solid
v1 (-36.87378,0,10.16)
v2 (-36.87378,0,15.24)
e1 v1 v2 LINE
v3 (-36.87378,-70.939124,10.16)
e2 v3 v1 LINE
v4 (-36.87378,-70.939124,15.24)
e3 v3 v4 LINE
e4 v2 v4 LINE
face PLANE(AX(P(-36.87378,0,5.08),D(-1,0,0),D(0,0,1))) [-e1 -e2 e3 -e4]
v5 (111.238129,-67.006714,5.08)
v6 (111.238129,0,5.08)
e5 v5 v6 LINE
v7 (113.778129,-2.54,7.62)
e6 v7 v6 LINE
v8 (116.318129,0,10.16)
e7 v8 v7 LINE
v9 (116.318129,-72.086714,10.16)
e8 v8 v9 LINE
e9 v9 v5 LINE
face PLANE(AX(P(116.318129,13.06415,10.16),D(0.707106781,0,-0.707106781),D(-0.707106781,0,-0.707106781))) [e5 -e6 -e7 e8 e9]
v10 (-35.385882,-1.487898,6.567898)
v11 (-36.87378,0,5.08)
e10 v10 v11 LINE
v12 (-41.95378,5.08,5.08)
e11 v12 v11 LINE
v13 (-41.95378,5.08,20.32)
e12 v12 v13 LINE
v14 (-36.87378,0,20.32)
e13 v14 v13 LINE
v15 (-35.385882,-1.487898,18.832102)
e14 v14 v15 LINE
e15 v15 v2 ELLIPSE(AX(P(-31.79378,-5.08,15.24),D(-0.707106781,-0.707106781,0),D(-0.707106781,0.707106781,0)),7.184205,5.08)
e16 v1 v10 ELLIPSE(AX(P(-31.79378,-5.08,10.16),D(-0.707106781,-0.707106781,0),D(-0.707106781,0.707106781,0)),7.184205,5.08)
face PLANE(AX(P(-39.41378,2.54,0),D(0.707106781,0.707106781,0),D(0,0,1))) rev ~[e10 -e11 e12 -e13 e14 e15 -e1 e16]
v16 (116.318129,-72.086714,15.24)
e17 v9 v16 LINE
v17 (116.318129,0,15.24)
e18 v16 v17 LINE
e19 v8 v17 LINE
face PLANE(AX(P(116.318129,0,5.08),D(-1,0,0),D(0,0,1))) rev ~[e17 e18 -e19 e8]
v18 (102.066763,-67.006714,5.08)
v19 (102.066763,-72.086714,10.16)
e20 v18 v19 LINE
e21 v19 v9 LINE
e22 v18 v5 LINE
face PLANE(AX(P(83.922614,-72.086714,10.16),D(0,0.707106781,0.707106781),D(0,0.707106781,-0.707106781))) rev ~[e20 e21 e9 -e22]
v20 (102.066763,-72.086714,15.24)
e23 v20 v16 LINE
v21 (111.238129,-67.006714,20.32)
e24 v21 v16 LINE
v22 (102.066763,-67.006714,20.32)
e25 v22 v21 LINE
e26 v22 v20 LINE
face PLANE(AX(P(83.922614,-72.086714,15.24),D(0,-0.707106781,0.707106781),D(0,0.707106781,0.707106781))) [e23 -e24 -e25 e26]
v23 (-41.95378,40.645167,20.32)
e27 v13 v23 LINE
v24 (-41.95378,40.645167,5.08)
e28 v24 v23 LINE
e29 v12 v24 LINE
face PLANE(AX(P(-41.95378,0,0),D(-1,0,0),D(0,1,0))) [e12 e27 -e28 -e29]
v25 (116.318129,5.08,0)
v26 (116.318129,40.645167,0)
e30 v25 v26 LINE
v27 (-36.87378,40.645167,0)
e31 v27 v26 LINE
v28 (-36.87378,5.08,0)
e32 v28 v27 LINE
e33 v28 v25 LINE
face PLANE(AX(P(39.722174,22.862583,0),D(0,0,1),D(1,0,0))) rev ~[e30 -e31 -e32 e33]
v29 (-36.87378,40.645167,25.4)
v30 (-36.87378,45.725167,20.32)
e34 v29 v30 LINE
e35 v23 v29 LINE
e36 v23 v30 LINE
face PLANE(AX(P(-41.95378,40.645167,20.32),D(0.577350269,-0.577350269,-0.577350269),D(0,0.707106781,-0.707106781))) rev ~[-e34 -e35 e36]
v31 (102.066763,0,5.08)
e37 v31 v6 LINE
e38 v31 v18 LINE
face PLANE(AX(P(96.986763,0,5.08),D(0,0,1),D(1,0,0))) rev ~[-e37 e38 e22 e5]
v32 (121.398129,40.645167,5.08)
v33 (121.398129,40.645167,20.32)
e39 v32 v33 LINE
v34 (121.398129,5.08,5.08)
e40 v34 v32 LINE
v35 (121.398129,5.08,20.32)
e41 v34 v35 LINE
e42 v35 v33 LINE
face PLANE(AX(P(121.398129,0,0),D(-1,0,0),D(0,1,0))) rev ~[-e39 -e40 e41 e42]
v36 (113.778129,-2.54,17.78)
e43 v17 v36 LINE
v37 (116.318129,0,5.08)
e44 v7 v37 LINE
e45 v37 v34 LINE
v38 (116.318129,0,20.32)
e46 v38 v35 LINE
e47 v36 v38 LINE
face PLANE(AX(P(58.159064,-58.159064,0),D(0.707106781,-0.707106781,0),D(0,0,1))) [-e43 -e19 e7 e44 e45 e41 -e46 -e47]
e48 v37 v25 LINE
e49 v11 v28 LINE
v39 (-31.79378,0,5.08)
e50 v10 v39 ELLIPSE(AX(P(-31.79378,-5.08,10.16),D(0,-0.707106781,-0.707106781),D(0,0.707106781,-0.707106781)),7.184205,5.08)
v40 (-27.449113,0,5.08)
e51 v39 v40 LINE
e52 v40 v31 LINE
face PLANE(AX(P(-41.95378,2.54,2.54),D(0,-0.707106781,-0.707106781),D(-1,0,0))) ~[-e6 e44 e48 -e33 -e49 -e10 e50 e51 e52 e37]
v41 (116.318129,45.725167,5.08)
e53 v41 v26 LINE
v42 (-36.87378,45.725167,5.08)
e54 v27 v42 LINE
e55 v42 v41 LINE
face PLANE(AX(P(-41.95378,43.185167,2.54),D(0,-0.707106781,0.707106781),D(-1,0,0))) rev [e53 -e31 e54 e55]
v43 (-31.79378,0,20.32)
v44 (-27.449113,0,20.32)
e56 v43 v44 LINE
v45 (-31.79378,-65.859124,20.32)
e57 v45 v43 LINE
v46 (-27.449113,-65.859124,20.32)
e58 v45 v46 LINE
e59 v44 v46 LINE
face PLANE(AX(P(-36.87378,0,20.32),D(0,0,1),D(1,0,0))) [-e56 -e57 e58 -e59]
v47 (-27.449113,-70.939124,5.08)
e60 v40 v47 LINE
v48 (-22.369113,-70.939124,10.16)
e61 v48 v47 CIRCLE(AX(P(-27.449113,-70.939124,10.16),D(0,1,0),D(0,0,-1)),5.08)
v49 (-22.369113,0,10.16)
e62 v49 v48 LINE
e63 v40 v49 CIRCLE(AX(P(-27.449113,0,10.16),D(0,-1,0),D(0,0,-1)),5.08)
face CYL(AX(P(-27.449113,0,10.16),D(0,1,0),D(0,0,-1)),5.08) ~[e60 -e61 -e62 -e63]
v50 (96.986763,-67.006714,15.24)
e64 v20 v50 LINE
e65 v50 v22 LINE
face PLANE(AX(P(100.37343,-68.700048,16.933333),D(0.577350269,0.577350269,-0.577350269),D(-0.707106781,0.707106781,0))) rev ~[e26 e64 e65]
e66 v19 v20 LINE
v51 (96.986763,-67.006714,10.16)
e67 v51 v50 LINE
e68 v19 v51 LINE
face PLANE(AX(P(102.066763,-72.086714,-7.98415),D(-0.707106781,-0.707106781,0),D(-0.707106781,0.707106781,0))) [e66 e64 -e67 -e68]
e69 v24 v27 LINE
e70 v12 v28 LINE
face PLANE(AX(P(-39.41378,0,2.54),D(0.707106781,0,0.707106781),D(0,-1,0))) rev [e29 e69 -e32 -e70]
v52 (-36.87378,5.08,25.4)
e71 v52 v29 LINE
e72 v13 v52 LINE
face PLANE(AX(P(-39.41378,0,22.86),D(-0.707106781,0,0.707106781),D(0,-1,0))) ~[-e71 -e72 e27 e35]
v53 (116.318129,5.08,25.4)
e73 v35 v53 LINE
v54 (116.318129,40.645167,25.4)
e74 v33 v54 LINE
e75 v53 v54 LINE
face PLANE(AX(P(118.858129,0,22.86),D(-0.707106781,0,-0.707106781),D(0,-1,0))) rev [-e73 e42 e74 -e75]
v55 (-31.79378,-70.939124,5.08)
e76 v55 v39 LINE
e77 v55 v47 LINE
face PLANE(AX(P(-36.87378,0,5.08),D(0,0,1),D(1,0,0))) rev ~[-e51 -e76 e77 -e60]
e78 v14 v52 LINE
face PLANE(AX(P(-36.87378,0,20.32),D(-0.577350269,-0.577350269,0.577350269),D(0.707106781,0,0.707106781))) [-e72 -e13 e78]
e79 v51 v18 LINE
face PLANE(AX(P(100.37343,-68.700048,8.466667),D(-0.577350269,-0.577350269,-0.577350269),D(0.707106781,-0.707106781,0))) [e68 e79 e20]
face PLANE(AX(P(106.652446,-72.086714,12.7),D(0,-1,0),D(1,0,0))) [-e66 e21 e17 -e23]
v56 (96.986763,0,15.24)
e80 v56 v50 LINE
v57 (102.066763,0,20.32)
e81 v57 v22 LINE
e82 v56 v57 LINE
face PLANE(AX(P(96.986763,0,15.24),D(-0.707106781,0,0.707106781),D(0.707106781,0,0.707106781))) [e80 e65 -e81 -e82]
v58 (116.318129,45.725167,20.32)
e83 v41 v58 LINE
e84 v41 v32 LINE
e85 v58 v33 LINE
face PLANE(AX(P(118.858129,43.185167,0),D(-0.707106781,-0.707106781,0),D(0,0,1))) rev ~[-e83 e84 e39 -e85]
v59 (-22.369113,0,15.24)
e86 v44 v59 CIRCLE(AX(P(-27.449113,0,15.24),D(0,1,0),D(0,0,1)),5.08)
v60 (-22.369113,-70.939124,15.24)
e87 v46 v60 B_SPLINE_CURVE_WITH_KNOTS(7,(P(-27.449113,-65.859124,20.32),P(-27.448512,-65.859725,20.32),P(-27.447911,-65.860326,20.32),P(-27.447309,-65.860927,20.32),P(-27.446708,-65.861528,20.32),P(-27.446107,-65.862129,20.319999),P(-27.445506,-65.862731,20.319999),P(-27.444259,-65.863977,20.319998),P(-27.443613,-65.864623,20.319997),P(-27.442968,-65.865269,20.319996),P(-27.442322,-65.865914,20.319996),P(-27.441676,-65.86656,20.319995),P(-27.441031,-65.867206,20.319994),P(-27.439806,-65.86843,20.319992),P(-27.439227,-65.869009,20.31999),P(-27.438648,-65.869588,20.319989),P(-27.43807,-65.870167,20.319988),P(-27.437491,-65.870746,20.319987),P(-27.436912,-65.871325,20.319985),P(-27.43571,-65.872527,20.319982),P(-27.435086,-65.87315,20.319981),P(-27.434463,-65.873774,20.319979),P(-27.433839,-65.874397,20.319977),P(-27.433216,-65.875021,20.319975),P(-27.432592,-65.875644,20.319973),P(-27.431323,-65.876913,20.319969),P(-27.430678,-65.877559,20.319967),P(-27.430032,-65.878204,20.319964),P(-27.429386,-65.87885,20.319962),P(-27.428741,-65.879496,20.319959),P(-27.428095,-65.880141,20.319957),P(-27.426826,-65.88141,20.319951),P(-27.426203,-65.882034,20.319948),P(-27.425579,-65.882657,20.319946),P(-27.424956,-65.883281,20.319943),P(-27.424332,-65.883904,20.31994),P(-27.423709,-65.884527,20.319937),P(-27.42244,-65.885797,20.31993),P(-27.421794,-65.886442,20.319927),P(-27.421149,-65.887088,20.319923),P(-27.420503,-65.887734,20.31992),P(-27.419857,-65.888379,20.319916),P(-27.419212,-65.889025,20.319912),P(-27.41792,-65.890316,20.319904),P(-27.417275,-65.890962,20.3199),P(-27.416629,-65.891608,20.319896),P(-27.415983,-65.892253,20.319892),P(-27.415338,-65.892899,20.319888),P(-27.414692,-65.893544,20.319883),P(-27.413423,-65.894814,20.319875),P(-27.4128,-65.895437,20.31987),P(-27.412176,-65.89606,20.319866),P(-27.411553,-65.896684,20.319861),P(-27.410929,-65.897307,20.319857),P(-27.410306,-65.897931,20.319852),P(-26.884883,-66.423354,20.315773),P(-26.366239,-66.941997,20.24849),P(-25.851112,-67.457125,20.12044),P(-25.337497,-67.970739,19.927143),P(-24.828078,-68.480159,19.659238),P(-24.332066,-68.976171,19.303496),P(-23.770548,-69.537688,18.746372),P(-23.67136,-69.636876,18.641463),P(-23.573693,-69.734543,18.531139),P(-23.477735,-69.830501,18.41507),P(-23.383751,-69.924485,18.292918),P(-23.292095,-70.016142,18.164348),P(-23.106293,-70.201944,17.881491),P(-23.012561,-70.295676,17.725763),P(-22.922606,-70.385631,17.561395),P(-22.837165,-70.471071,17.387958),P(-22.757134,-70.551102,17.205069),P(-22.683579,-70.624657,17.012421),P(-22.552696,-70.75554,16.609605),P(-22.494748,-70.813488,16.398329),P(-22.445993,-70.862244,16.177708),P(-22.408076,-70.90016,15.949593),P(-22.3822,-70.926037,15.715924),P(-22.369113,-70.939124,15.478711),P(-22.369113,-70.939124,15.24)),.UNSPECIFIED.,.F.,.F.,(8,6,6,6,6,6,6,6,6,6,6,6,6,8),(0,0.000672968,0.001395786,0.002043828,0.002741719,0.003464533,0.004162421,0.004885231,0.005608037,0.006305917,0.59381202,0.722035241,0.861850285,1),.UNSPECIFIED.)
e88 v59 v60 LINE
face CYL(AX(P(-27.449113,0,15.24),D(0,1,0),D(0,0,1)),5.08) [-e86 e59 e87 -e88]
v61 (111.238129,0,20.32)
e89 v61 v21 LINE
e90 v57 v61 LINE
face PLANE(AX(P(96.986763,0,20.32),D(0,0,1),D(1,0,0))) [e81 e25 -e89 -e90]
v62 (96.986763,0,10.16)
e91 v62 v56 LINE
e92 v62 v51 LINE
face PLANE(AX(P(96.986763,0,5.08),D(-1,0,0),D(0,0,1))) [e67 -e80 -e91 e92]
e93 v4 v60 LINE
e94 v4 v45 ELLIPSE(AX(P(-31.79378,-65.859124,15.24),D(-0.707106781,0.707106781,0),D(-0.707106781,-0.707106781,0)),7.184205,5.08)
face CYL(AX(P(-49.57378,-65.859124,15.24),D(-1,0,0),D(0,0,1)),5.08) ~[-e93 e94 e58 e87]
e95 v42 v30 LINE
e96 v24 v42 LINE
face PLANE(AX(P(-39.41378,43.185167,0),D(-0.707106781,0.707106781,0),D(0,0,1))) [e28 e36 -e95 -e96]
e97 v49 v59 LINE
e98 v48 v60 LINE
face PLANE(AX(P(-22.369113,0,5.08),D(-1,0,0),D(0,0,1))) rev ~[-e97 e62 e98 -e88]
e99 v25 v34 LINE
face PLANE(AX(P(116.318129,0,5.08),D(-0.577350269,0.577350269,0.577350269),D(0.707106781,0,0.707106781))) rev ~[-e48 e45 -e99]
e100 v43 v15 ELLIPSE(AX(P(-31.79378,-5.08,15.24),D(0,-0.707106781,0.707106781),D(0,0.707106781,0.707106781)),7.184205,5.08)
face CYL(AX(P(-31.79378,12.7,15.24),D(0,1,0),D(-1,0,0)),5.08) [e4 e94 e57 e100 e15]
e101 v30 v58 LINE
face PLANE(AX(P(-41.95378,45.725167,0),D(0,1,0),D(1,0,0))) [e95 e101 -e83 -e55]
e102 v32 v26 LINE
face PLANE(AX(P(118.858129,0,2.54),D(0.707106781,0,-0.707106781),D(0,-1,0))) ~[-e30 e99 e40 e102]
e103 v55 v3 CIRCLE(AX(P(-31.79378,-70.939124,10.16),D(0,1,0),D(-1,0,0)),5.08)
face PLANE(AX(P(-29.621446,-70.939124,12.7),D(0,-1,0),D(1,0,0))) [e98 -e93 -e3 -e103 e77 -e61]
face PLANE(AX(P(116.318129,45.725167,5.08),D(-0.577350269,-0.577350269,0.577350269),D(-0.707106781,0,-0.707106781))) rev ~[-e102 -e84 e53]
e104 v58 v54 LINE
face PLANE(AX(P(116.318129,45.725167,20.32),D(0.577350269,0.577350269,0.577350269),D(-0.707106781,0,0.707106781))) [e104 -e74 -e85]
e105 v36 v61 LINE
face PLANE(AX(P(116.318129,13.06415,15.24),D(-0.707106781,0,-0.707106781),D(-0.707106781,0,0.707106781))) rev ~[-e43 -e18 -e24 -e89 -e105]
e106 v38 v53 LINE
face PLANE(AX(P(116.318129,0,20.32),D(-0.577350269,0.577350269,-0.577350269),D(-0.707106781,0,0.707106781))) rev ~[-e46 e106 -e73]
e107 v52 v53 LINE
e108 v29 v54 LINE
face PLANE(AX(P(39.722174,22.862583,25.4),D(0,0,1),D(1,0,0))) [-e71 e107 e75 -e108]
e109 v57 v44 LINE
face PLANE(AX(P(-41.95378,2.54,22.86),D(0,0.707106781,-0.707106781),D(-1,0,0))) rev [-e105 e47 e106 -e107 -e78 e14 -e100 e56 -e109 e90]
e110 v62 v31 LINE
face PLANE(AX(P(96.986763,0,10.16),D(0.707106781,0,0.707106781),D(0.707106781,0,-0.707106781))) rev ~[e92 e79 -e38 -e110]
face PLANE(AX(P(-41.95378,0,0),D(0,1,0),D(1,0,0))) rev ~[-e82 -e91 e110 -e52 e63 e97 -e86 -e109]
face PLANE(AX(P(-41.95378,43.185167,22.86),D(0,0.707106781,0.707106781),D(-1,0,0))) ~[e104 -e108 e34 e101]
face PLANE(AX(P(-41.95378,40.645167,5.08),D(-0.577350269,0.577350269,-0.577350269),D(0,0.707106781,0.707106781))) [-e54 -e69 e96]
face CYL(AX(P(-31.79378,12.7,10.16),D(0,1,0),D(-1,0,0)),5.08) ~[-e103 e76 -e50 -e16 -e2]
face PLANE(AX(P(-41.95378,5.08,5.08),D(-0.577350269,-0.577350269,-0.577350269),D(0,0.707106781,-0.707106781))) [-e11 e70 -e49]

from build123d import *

# Parameters (mm, degrees)
F0_W         = 163.3519083261
F0_H         = 45.7251667976
F1_DEPTH     = 25.4
F2_SIZE      = 5.08
F3_W         = 14.5046669376
F3_H         = 15.24
F4_DEPTH     = 70.9391236305
F5_W         = 19.3313653898
F5_H         = 15.24
F6_DEPTH     = 72.0867142081
F7_T1_DEPTH  = 39.9046669376
F7_T6_DEPTH  = 96.3391236305
F7_T12_DEPTH = 96.3391236305
F7_T18_DEPTH = 96.3391236305
F7_T24_DEPTH = 83.6391236305
F7_T29_DEPTH = 83.6391236305
F7_T34_DEPTH = 83.6391236305
F7_T39_DEPTH = 83.6391236305
F7_T44_DEPTH = 96.3391236305
F7_T50_DEPTH = 96.3391236305
F7_T56_DEPTH = 96.3391236305
F8_T1_DEPTH  = 6.4524666085
F8_T3_DEPTH  = 6.4524666085
F8_T5_DEPTH  = 85.150863787
F8_T7_DEPTH  = 45.4596645476
F8_T9_DEPTH  = 41.3682991577
F8_T14_DEPTH = 98.2150133659
F8_T19_DEPTH = 98.2150133659
F8_T24_DEPTH = 98.2150133659
F8_T29_DEPTH = 98.2150133659


# Not quite as in the source:
# - a fillet or chamfer that OpenCascade refuses, or shapes differently, is made with other operations: its cross-section is extruded or revolved along the edge and cut away or added


with BuildPart() as f1:
    # F0 (on Top) → F1 (new body)
    with BuildSketch(Plane.XY):
        with Locations((39.7221744061, 22.8625833988)):
            Rectangle(F0_W, F0_H)
    extrude(amount=F1_DEPTH)

    # F2
    f2_edges = [f1.edges().sort_by_distance(p)[0] for p in [
        (121.398129, 22.862583, 25.4),
        (121.398129, 22.862583, 0),
        (39.722174, 0, 0),
        (121.398129, 0, 12.7),
        (121.398129, 45.725167, 12.7),
        (39.722174, 45.725167, 0),
        (39.722174, 45.725167, 25.4),
        (-41.95378, 22.862583, 25.4),
        (-41.95378, 0, 12.7),
        (-41.95378, 22.862583, 0),
        (-41.95378, 45.725167, 12.7),
        (39.722174, 0, 25.4),
    ]]
    chamfer(f2_edges, length=F2_SIZE)

    # F3 (on face) → F4 (join)
    with BuildSketch(Plane.XZ):
        with Locations((-29.6214462882, 12.7)):
            Rectangle(F3_W, F3_H)
    extrude(amount=F4_DEPTH)

    # F5 (on face) → F6 (join)
    with BuildSketch(Plane.XZ):
        with Locations((106.6524458742, 12.7)):
            Rectangle(F5_W, F5_H)
    extrude(amount=F6_DEPTH)

    # F7: fillet of radius 5.08 on 5 edges, made by hand

    # F7_s2 → F7_t1 (cut)
    with BuildSketch(Plane.YZ.offset(-49.573779757)):
        with BuildLine():
            ThreePointArc((-65.8591236305, 20.32), (-69.451226079, 18.8321024484), (-70.9391236305, 15.24))
            Line((-70.9391236305, 15.24), (-70.9391236305, 20.32))
            Line((-70.9391236305, 20.32), (-65.8591236305, 20.32))
        make_face()
    extrude(amount=F7_T1_DEPTH, mode=Mode.SUBTRACT)


with BuildPart() as f7_tool4:
    # F7_s5 → F7_t6 (new body)
    with BuildSketch(Plane.XZ.offset(-12.7)):
        with BuildLine():
            ThreePointArc((-36.873779757, 15.24), (-35.3858822055, 18.8321024484), (-31.793779757, 20.32))
            Line((-31.793779757, 20.32), (-36.873779757, 20.32))
            Line((-36.873779757, 20.32), (-36.873779757, 15.24))
        make_face()
    extrude(amount=F7_T6_DEPTH)

    split(bisect_by=Plane(origin=(-18.4368898785, -18.4368898785, 0), x_dir=(0, 0, 1), z_dir=(0.7071067812, 0.7071067812, 0)), keep=Keep.TOP)

    split(bisect_by=Plane(origin=(0, -10.16, 10.16), x_dir=(1, 0, 0), z_dir=(0, -0.7071067812, 0.7071067812)), keep=Keep.TOP)


with BuildPart() as f1_1:
    add(f1.part)

    # F7_t3: cut F7_tool4
    add(f7_tool4.part, mode=Mode.SUBTRACT)


with BuildPart() as f7_tool10:
    # F7_s11 → F7_t12 (new body)
    with BuildSketch(Plane.XZ.offset(-12.7)):
        with BuildLine():
            ThreePointArc((-36.873779757, 15.24), (-35.3858822055, 18.8321024484), (-31.793779757, 20.32))
            Line((-31.793779757, 20.32), (-36.873779757, 20.32))
            Line((-36.873779757, 20.32), (-36.873779757, 15.24))
        make_face()
    extrude(amount=F7_T12_DEPTH)

    split(bisect_by=Plane(origin=(-18.4368898785, -18.4368898785, 0), x_dir=(0, 0, 1), z_dir=(-0.7071067812, -0.7071067812, 0)), keep=Keep.TOP)

    split(bisect_by=Plane(origin=(0, -10.16, 10.16), x_dir=(1, 0, 0), z_dir=(0, 0.7071067812, -0.7071067812)), keep=Keep.TOP)


with BuildPart() as f1_2:
    add(f1_1.part)

    # F7_t9: cut F7_tool10
    add(f7_tool10.part, mode=Mode.SUBTRACT)


with BuildPart() as f7_tool16:
    # F7_s17 → F7_t18 (new body)
    with BuildSketch(Plane.XZ.offset(-12.7)):
        with BuildLine():
            ThreePointArc((-36.873779757, 15.24), (-35.3858822055, 18.8321024484), (-31.793779757, 20.32))
            Line((-31.793779757, 20.32), (-36.873779757, 20.32))
            Line((-36.873779757, 20.32), (-36.873779757, 15.24))
        make_face()
    extrude(amount=F7_T18_DEPTH)

    split(bisect_by=Plane(origin=(-18.4368898785, -18.4368898785, 0), x_dir=(0, 0, 1), z_dir=(-0.7071067812, -0.7071067812, 0)), keep=Keep.TOP)

    split(bisect_by=Plane(origin=(0, -10.16, 10.16), x_dir=(1, 0, 0), z_dir=(0, -0.7071067812, 0.7071067812)), keep=Keep.TOP)


with BuildPart() as f1_3:
    add(f1_2.part)

    # F7_t15: cut F7_tool16
    add(f7_tool16.part, mode=Mode.SUBTRACT)


with BuildPart() as f7_tool22:
    # F7_s23 → F7_t24 (new body)
    with BuildSketch(Plane.XZ):
        with BuildLine():
            ThreePointArc((-27.4491128194, 5.08), (-23.857010371, 6.5678975516), (-22.3691128194, 10.16))
            Line((-22.3691128194, 10.16), (-22.3691128194, 5.08))
            Line((-22.3691128194, 5.08), (-27.4491128194, 5.08))
        make_face()
    extrude(amount=F7_T24_DEPTH)

    split(bisect_by=Plane(origin=(0, 2.54, 2.54), x_dir=(1, 0, 0), z_dir=(0, 0.7071067812, 0.7071067812)), keep=Keep.TOP)


with BuildPart() as f1_4:
    add(f1_3.part)

    # F7_t21: cut F7_tool22
    add(f7_tool22.part, mode=Mode.SUBTRACT)


with BuildPart() as f7_tool27:
    # F7_s28 → F7_t29 (new body)
    with BuildSketch(Plane.XZ):
        with BuildLine():
            ThreePointArc((-27.4491128194, 5.08), (-23.857010371, 6.5678975516), (-22.3691128194, 10.16))
            Line((-22.3691128194, 10.16), (-22.3691128194, 5.08))
            Line((-22.3691128194, 5.08), (-27.4491128194, 5.08))
        make_face()
    extrude(amount=F7_T29_DEPTH)

    split(bisect_by=Plane(origin=(0, 2.54, 2.54), x_dir=(1, 0, 0), z_dir=(0, -0.7071067812, -0.7071067812)), keep=Keep.TOP)


with BuildPart() as f1_5:
    add(f1_4.part)

    # F7_t26: cut F7_tool27
    add(f7_tool27.part, mode=Mode.SUBTRACT)


with BuildPart() as f7_tool32:
    # F7_s33 → F7_t34 (new body)
    with BuildSketch(Plane.XZ):
        with BuildLine():
            ThreePointArc((-27.4491128194, 20.32), (-23.857010371, 18.8321024484), (-22.3691128194, 15.24))
            Line((-22.3691128194, 15.24), (-22.3691128194, 20.32))
            Line((-22.3691128194, 20.32), (-27.4491128194, 20.32))
        make_face()
    extrude(amount=F7_T34_DEPTH)

    split(bisect_by=Plane(origin=(0, -10.16, 10.16), x_dir=(1, 0, 0), z_dir=(0, 0.7071067812, -0.7071067812)), keep=Keep.TOP)


with BuildPart() as f1_6:
    add(f1_5.part)

    # F7_t31: cut F7_tool32
    add(f7_tool32.part, mode=Mode.SUBTRACT)


with BuildPart() as f7_tool37:
    # F7_s38 → F7_t39 (new body)
    with BuildSketch(Plane.XZ):
        with BuildLine():
            ThreePointArc((-27.4491128194, 20.32), (-23.857010371, 18.8321024484), (-22.3691128194, 15.24))
            Line((-22.3691128194, 15.24), (-22.3691128194, 20.32))
            Line((-22.3691128194, 20.32), (-27.4491128194, 20.32))
        make_face()
    extrude(amount=F7_T39_DEPTH)

    split(bisect_by=Plane(origin=(0, -10.16, 10.16), x_dir=(1, 0, 0), z_dir=(0, -0.7071067812, 0.7071067812)), keep=Keep.TOP)


with BuildPart() as f1_7:
    add(f1_6.part)

    # F7_t36: cut F7_tool37
    add(f7_tool37.part, mode=Mode.SUBTRACT)


with BuildPart() as f7_tool42:
    # F7_s43 → F7_t44 (new body)
    with BuildSketch(Plane.XZ.offset(-12.7)):
        with BuildLine():
            ThreePointArc((-36.873779757, 10.16), (-35.3858822055, 6.5678975516), (-31.793779757, 5.08))
            Line((-31.793779757, 5.08), (-36.873779757, 5.08))
            Line((-36.873779757, 5.08), (-36.873779757, 10.16))
        make_face()
    extrude(amount=F7_T44_DEPTH)

    split(bisect_by=Plane(origin=(-18.4368898785, -18.4368898785, 0), x_dir=(0, 0, 1), z_dir=(0.7071067812, 0.7071067812, 0)), keep=Keep.TOP)

    split(bisect_by=Plane(origin=(0, 2.54, 2.54), x_dir=(1, 0, 0), z_dir=(0, -0.7071067812, -0.7071067812)), keep=Keep.TOP)


with BuildPart() as f1_8:
    add(f1_7.part)

    # F7_t41: cut F7_tool42
    add(f7_tool42.part, mode=Mode.SUBTRACT)


with BuildPart() as f7_tool48:
    # F7_s49 → F7_t50 (new body)
    with BuildSketch(Plane.XZ.offset(-12.7)):
        with BuildLine():
            ThreePointArc((-36.873779757, 10.16), (-35.3858822055, 6.5678975516), (-31.793779757, 5.08))
            Line((-31.793779757, 5.08), (-36.873779757, 5.08))
            Line((-36.873779757, 5.08), (-36.873779757, 10.16))
        make_face()
    extrude(amount=F7_T50_DEPTH)

    split(bisect_by=Plane(origin=(-18.4368898785, -18.4368898785, 0), x_dir=(0, 0, 1), z_dir=(-0.7071067812, -0.7071067812, 0)), keep=Keep.TOP)

    split(bisect_by=Plane(origin=(0, 2.54, 2.54), x_dir=(1, 0, 0), z_dir=(0, 0.7071067812, 0.7071067812)), keep=Keep.TOP)


with BuildPart() as f1_9:
    add(f1_8.part)

    # F7_t47: cut F7_tool48
    add(f7_tool48.part, mode=Mode.SUBTRACT)


with BuildPart() as f7_tool54:
    # F7_s55 → F7_t56 (new body)
    with BuildSketch(Plane.XZ.offset(-12.7)):
        with BuildLine():
            ThreePointArc((-36.873779757, 10.16), (-35.3858822055, 6.5678975516), (-31.793779757, 5.08))
            Line((-31.793779757, 5.08), (-36.873779757, 5.08))
            Line((-36.873779757, 5.08), (-36.873779757, 10.16))
        make_face()
    extrude(amount=F7_T56_DEPTH)

    split(bisect_by=Plane(origin=(-18.4368898785, -18.4368898785, 0), x_dir=(0, 0, 1), z_dir=(-0.7071067812, -0.7071067812, 0)), keep=Keep.TOP)

    split(bisect_by=Plane(origin=(0, 2.54, 2.54), x_dir=(1, 0, 0), z_dir=(0, -0.7071067812, -0.7071067812)), keep=Keep.TOP)


with BuildPart() as f1_10:
    add(f1_9.part)

    # F7_t53: cut F7_tool54
    add(f7_tool54.part, mode=Mode.SUBTRACT)

    # F8: chamfer of 5.08 on 7 edges, made by hand

    # F8_s2 → F8_t1 (cut)
    with BuildSketch(Plane(origin=(4.9133496571, 4.9133496571, -4.9133496571), x_dir=(0.7071067812, -0.7071067812, 0), z_dir=(-0.5773502692, -0.5773502692, 0.5773502692))):
        Polygon((119.5530023794, 30.9044155805), (123.1451048279, 24.6827116338), (115.960899931, 24.6827116338), align=None)
    extrude(amount=F8_T1_DEPTH, mode=Mode.SUBTRACT)

    # F8_s4 → F8_t3 (cut)
    with BuildSketch(Plane(origin=(13.3800163237, 13.3800163237, 13.3800163237), x_dir=(0.7071067812, -0.7071067812, 0), z_dir=(-0.5773502692, -0.5773502692, -0.5773502692))):
        Polygon((119.5530023794, -10.1654024249), (123.1451048279, -3.9436984783), (115.960899931, -3.9436984783), align=None)
    extrude(amount=F8_T3_DEPTH, mode=Mode.SUBTRACT)

    # F8_s6 → F8_t5 (cut)
    with BuildSketch(Plane.XZ):
        Polygon((96.9867631793, 15.24), (102.0667631793, 20.32), (96.9867631793, 20.32), align=None)
        Polygon((96.9867631793, 10.16), (102.0667631793, 5.08), (96.9867631793, 5.08), align=None)
    extrude(amount=F8_T5_DEPTH, mode=Mode.SUBTRACT)

    # F8_s8 → F8_t7 (cut)
    with BuildSketch(Plane.YZ.offset(83.9226136004)):
        Polygon((-72.0867142081, 15.24), (-67.0067142081, 20.32), (-72.0867142081, 20.32), align=None)
        Polygon((-72.0867142081, 10.16), (-67.0067142081, 5.08), (-72.0867142081, 5.08), align=None)
    extrude(amount=F8_T7_DEPTH, mode=Mode.SUBTRACT)

    # F8_s10 → F8_t9 (cut)
    with BuildSketch(Plane.XY.offset(-7.9841495789)):
        Polygon((102.0667631793, -72.0867142081), (96.9867631793, -67.0067142081), (96.9867631793, -72.0867142081), align=None)
    extrude(amount=F8_T9_DEPTH, mode=Mode.SUBTRACT)


with BuildPart() as f8_tool12:
    # F8_s13 → F8_t14 (new body)
    with BuildSketch(Plane.XZ.offset(-13.0641495789)):
        Polygon((116.3181285691, 15.24), (111.2381285691, 20.32), (116.3181285691, 20.32), align=None)
    extrude(amount=F8_T14_DEPTH)

    split(bisect_by=Plane(origin=(0, -10.16, 10.16), x_dir=(1, 0, 0), z_dir=(0, -0.7071067812, 0.7071067812)), keep=Keep.TOP)


with BuildPart() as f1_11:
    add(f1_10.part)

    # F8_t11: cut F8_tool12
    add(f8_tool12.part, mode=Mode.SUBTRACT)


with BuildPart() as f8_tool17:
    # F8_s18 → F8_t19 (new body)
    with BuildSketch(Plane.XZ.offset(-13.0641495789)):
        Polygon((116.3181285691, 15.24), (111.2381285691, 20.32), (116.3181285691, 20.32), align=None)
    extrude(amount=F8_T19_DEPTH)

    split(bisect_by=Plane(origin=(58.1590642846, -58.1590642846, 0), x_dir=(0, 0, 1), z_dir=(0.7071067812, -0.7071067812, 0)), keep=Keep.TOP)


with BuildPart() as f1_12:
    add(f1_11.part)

    # F8_t16: cut F8_tool17
    add(f8_tool17.part, mode=Mode.SUBTRACT)


with BuildPart() as f8_tool22:
    # F8_s23 → F8_t24 (new body)
    with BuildSketch(Plane.XZ.offset(-13.0641495789)):
        Polygon((116.3181285691, 10.16), (111.2381285691, 5.08), (116.3181285691, 5.08), align=None)
    extrude(amount=F8_T24_DEPTH)

    split(bisect_by=Plane(origin=(0, 2.54, 2.54), x_dir=(1, 0, 0), z_dir=(0, -0.7071067812, -0.7071067812)), keep=Keep.TOP)


with BuildPart() as f1_13:
    add(f1_12.part)

    # F8_t21: cut F8_tool22
    add(f8_tool22.part, mode=Mode.SUBTRACT)


with BuildPart() as f8_tool27:
    # F8_s28 → F8_t29 (new body)
    with BuildSketch(Plane.XZ.offset(-13.0641495789)):
        Polygon((116.3181285691, 10.16), (111.2381285691, 5.08), (116.3181285691, 5.08), align=None)
    extrude(amount=F8_T29_DEPTH)

    split(bisect_by=Plane(origin=(58.1590642846, -58.1590642846, 0), x_dir=(0, 0, 1), z_dir=(0.7071067812, -0.7071067812, 0)), keep=Keep.TOP)


with BuildPart() as f1_14:
    add(f1_13.part)

    # F8_t26: cut F8_tool27
    add(f8_tool27.part, mode=Mode.SUBTRACT)


solid = f1_14.part
